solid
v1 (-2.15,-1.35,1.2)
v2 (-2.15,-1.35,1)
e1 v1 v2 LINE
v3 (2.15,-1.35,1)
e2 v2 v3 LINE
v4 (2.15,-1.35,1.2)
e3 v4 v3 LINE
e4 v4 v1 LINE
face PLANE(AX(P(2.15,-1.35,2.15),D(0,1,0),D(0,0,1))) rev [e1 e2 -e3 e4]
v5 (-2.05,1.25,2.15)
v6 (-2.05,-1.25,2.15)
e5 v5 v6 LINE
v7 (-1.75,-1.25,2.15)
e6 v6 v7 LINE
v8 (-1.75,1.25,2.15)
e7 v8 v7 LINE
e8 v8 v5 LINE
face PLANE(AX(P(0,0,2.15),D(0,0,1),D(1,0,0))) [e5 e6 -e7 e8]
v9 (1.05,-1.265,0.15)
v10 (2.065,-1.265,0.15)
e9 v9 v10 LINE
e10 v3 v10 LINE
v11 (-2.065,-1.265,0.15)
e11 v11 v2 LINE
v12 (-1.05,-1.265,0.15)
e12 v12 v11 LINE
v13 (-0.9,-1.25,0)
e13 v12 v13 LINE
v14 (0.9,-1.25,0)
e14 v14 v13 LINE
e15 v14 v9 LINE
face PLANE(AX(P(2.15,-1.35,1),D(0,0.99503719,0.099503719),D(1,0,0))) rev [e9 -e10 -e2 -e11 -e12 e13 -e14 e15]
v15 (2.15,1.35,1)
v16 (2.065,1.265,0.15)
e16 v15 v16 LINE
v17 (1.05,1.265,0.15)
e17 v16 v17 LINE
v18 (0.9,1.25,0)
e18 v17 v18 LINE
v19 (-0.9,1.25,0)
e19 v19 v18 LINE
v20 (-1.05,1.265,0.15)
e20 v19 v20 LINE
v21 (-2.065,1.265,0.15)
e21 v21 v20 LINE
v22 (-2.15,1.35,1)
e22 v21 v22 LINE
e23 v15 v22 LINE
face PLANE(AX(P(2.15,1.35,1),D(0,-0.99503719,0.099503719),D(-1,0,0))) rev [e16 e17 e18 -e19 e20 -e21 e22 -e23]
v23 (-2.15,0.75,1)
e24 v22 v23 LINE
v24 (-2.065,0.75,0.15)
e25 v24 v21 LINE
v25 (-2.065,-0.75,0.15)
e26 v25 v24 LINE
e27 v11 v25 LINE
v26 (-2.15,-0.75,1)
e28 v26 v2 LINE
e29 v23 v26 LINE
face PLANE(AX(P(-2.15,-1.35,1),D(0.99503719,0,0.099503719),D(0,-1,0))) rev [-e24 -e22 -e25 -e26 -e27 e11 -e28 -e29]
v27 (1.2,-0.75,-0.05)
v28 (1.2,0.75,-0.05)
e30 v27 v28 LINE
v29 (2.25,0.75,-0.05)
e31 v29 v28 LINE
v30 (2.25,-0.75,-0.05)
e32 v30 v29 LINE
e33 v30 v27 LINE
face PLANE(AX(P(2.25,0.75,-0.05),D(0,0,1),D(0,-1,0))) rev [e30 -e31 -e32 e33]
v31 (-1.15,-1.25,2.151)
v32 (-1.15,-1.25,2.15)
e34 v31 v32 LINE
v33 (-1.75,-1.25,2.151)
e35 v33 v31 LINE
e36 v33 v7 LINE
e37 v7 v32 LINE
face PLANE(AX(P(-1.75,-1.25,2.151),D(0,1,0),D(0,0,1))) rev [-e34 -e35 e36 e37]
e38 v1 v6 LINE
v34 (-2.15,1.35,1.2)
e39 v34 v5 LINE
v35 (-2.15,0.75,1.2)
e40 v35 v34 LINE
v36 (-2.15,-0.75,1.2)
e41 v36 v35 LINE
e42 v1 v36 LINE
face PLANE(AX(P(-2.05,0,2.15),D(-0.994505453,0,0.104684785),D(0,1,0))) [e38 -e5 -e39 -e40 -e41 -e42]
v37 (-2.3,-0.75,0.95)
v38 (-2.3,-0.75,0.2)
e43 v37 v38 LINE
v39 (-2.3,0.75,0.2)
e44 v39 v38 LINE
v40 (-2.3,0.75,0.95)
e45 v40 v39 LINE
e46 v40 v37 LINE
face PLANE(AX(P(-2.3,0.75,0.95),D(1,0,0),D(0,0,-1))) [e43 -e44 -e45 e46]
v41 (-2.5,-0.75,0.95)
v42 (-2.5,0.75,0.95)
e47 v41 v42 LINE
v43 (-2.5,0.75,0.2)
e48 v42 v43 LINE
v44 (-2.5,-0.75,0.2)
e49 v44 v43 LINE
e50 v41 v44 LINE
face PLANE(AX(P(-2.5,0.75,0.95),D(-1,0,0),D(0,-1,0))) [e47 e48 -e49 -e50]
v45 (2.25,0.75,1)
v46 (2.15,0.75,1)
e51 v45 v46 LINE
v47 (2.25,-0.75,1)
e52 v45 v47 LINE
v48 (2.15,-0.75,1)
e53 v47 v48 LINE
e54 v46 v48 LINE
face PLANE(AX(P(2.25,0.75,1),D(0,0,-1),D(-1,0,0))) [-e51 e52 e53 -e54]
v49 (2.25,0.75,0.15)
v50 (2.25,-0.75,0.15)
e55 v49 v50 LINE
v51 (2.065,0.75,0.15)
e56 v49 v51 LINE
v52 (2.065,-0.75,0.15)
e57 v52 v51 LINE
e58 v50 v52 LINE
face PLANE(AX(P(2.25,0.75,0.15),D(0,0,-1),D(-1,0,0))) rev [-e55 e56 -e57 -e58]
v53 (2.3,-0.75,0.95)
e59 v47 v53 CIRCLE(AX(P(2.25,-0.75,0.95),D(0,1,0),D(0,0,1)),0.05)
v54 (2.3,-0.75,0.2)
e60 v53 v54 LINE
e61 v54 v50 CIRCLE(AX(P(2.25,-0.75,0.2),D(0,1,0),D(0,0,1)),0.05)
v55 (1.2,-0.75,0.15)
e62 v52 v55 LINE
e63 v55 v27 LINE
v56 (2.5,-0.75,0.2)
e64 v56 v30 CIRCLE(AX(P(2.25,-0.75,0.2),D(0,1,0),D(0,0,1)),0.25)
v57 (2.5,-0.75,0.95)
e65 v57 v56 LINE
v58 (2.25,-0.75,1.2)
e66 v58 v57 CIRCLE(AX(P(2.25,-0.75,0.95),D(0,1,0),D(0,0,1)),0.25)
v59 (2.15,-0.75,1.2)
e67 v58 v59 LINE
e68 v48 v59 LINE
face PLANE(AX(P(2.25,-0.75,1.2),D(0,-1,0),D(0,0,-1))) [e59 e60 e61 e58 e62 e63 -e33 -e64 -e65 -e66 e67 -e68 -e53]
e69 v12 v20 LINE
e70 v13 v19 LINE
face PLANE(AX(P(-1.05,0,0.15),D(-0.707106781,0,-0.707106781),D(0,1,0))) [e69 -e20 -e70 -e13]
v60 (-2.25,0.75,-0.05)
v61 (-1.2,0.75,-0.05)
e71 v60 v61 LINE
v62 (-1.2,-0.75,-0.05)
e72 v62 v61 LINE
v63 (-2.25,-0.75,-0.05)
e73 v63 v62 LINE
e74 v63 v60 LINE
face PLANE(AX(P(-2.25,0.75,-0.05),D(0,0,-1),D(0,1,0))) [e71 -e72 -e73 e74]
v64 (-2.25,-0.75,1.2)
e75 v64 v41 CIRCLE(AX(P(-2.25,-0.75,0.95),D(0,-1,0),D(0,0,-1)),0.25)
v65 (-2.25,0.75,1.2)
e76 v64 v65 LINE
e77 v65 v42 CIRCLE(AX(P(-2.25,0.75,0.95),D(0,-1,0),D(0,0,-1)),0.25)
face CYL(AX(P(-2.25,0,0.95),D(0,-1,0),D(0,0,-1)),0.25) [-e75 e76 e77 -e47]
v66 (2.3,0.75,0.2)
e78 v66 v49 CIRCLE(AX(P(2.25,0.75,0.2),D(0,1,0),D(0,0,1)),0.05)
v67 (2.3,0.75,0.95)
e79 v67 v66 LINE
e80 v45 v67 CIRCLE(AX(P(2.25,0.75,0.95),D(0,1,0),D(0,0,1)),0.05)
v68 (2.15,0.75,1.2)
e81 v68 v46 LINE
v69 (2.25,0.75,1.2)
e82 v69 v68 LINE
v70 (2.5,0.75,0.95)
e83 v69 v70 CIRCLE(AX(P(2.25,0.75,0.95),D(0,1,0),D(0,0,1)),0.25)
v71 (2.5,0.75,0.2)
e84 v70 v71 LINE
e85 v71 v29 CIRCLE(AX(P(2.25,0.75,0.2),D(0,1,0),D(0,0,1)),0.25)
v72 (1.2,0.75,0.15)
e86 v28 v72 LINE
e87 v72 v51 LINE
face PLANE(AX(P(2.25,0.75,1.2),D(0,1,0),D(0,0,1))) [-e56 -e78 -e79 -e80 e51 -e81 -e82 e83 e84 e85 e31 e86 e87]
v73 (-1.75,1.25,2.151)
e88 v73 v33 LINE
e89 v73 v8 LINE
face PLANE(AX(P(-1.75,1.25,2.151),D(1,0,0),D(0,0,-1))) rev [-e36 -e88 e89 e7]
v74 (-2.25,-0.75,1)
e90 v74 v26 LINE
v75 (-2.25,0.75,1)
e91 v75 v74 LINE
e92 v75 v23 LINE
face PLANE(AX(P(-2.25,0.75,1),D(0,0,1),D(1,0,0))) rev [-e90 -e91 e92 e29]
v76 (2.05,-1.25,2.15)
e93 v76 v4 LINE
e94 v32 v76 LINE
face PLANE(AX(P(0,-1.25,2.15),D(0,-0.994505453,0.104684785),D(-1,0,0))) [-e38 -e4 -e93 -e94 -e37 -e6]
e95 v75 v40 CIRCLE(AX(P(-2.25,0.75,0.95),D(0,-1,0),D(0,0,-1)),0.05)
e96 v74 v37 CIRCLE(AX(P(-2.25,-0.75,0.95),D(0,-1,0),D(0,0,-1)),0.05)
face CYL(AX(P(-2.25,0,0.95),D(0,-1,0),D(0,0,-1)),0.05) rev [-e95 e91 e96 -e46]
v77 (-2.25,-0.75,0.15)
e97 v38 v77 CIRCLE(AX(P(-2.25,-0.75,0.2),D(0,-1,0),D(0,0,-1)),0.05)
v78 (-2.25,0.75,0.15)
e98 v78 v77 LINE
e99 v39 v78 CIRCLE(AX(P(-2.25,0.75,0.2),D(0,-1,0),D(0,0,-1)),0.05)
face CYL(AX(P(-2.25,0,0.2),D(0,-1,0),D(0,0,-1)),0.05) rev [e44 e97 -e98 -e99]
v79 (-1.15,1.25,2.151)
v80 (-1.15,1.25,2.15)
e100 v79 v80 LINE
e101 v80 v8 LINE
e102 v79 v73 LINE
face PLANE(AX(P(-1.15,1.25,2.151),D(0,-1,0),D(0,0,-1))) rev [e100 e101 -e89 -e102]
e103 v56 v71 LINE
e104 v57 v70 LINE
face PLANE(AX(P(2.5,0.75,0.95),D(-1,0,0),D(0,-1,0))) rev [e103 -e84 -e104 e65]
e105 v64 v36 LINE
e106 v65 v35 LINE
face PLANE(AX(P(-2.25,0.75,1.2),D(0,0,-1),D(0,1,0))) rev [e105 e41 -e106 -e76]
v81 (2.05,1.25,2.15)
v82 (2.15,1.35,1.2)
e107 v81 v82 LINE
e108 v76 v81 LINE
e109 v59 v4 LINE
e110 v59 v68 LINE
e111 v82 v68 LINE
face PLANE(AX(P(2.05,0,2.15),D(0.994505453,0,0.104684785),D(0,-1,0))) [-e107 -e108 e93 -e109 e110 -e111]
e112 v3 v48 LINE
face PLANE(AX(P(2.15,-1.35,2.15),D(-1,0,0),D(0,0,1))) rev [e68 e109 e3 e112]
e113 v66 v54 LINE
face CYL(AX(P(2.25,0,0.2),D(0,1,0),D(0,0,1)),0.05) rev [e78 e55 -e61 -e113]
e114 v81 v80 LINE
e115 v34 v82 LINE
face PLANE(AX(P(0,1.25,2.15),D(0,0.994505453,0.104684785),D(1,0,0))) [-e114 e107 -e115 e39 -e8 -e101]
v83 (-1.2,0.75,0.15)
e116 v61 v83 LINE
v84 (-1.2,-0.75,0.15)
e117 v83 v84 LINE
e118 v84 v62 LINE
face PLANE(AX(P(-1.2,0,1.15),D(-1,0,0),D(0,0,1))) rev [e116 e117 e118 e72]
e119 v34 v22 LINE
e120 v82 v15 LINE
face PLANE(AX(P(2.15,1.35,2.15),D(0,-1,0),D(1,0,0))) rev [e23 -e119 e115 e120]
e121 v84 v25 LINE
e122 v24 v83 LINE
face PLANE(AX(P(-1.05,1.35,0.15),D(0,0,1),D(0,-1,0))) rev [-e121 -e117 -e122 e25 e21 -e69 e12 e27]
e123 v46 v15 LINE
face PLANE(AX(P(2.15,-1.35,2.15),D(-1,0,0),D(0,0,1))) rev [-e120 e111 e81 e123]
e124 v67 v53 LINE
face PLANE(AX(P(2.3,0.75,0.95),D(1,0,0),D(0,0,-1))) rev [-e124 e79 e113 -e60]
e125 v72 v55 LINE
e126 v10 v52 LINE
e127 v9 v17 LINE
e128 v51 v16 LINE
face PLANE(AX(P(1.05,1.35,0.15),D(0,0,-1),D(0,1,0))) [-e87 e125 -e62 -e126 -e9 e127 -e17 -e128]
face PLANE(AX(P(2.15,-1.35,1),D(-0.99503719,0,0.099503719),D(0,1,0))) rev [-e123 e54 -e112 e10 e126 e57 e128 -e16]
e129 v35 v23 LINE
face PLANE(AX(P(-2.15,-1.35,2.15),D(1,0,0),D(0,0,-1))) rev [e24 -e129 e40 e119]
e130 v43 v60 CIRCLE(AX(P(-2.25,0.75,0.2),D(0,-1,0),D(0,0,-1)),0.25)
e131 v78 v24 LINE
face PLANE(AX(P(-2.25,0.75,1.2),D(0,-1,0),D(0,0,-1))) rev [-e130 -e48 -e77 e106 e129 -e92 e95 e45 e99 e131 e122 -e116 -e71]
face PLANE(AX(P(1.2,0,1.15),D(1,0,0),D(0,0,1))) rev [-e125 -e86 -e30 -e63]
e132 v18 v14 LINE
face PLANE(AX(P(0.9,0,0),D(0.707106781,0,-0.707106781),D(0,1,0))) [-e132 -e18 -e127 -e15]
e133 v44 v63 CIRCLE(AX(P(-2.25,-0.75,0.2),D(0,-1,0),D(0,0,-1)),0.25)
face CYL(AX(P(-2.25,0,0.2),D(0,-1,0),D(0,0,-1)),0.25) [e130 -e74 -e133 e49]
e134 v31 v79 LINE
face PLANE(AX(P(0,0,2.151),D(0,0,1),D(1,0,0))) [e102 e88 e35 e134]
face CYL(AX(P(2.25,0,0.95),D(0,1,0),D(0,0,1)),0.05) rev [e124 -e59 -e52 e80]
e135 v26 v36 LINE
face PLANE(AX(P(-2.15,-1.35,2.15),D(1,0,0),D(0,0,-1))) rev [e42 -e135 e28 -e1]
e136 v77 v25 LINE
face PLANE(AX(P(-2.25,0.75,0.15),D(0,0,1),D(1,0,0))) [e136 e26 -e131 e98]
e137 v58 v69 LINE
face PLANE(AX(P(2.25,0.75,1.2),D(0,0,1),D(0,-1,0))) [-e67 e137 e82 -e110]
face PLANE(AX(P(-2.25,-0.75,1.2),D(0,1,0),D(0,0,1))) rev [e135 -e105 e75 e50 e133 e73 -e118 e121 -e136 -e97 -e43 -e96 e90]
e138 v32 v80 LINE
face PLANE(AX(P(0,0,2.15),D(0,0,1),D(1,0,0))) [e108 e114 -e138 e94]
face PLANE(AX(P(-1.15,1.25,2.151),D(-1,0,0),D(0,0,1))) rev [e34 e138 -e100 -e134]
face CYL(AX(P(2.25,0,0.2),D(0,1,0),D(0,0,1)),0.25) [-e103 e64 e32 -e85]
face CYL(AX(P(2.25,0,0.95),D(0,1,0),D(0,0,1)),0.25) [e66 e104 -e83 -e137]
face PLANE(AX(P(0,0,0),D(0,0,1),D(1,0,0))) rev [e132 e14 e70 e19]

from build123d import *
from OCP.BRepFilletAPI import BRepFilletAPI_MakeChamfer

# Parameters (mm, degrees)
SZKIC1_W                    = 4.3
SZKIC1_H                    = 2.7
DODANIE_WYCI_GNI_CIE1_DEPTH = 2.15
SFAZOWANIE1_SIZE            = 0.95
SFAZOWANIE1_SIZE2           = 0.1
SFAZOWANIE2_SIZE            = 0.1
SFAZOWANIE2_SIZE2           = 1
SZKIC2_W                    = 0.6
SZKIC2_H                    = 2.5
DODANIE_WYCI_GNI_CIE2_DEPTH = 0.001
SZKIC3_W                    = 0.15
SZKIC3_H                    = 2.7
WYTNIJ_WYCI_GNI_CIE1_DEPTH  = 1.1
SFAZOWANIE3_SIZE            = 0.15
SZKIC4_W                    = 0.2
SZKIC4_H                    = 1.5
SFAZOWANIE3_OF_LUSTRO1_SIZE = 0.15


with BuildPart() as part:
    # Szkic1 → Dodanie-wyciągnięcie1 (new body)
    with BuildSketch(Plane.XY):
        Rectangle(SZKIC1_W, SZKIC1_H)
    extrude(amount=DODANIE_WYCI_GNI_CIE1_DEPTH)

    # Sfazowanie1: one chamfer whose edges measure the first distance from different faces: ONE call of the kernel's chamfer builder (chamfer() names one face for all edges)
    sfazowanie1_edges_1 = [part.edges().sort_by_distance(p)[0] for p in [
        (2.15, 0, 2.15),
    ]]
    sfazowanie1_side_1 = [part.faces().sort_by_distance(p)[0] for p in [
        (2.15, 0, 1.075),
    ]]
    sfazowanie1_edges_2 = [part.edges().sort_by_distance(p)[0] for p in [
        (0, 1.35, 2.15),
    ]]
    sfazowanie1_side_2 = [part.faces().sort_by_distance(p)[0] for p in [
        (0, 1.35, 1.075),
    ]]
    sfazowanie1_edges_3 = [part.edges().sort_by_distance(p)[0] for p in [
        (-2.15, 0, 2.15),
    ]]
    sfazowanie1_side_3 = [part.faces().sort_by_distance(p)[0] for p in [
        (-2.15, 0, 1.075),
    ]]
    sfazowanie1_edges_4 = [part.edges().sort_by_distance(p)[0] for p in [
        (0, -1.35, 2.15),
    ]]
    sfazowanie1_side_4 = [part.faces().sort_by_distance(p)[0] for p in [
        (0, -1.35, 1.075),
    ]]
    sfazowanie1 = BRepFilletAPI_MakeChamfer(part.part.solid().wrapped)
    for e in sfazowanie1_edges_1:
        sfazowanie1.Add(SFAZOWANIE1_SIZE, SFAZOWANIE1_SIZE2, e.wrapped, sfazowanie1_side_1[0].wrapped)  # the first distance lies on this face
    for e in sfazowanie1_edges_2:
        sfazowanie1.Add(SFAZOWANIE1_SIZE, SFAZOWANIE1_SIZE2, e.wrapped, sfazowanie1_side_2[0].wrapped)  # the first distance lies on this face
    for e in sfazowanie1_edges_3:
        sfazowanie1.Add(SFAZOWANIE1_SIZE, SFAZOWANIE1_SIZE2, e.wrapped, sfazowanie1_side_3[0].wrapped)  # the first distance lies on this face
    for e in sfazowanie1_edges_4:
        sfazowanie1.Add(SFAZOWANIE1_SIZE, SFAZOWANIE1_SIZE2, e.wrapped, sfazowanie1_side_4[0].wrapped)  # the first distance lies on this face
    add(Compound.cast(sfazowanie1.Shape()), mode=Mode.REPLACE)

    # Sfazowanie2
    sfazowanie2_edges = [part.edges().sort_by_distance(p)[0] for p in [
        (0, 1.35, 0),
        (2.15, 0, 0),
        (0, -1.35, 0),
        (-2.15, 0, 0),
    ]]
    sfazowanie2_side = [part.faces().sort_by_distance(p)[0] for p in [
        (0, 0, 0),
    ]]
    chamfer(sfazowanie2_edges, length=SFAZOWANIE2_SIZE, length2=SFAZOWANIE2_SIZE2, reference=sfazowanie2_side[0])

    # Szkic2 → Dodanie-wyciągnięcie2 (add)
    with BuildSketch(Plane.XY.offset(2.15)):
        with Locations((-1.45, 0)):
            Rectangle(SZKIC2_W, SZKIC2_H)
    extrude(amount=DODANIE_WYCI_GNI_CIE2_DEPTH)

    # Szkic3 → Wytnij-wyciągnięcie1 (cut)
    with BuildSketch(Plane.ZY.offset(2.15)):
        with Locations((0.075, 0)):
            Rectangle(SZKIC3_W, SZKIC3_H)
    wytnij_wyci_gni_cie1 = extrude(amount=-WYTNIJ_WYCI_GNI_CIE1_DEPTH, mode=Mode.SUBTRACT)

    # Sfazowanie3
    sfazowanie3_edges = [part.edges().sort_by_distance(p)[0] for p in [
        (-1.05, 0, 0),
    ]]
    chamfer(sfazowanie3_edges, length=SFAZOWANIE3_SIZE - 0.0001)  # a hair under: the kernel refuses the full size

    # Wyciągnięcie po ścieżce2: sweep along a path in Szkic6
    with BuildLine(Plane(origin=(0, 0, 0), x_dir=(1, 0, 0), z_dir=(0, 1, 0))) as wyci_gni_cie_po_cie_ce2_path:
        Line((-2.15, -1.2), (-2.25, -1.2))
        ThreePointArc((-2.25, -1.2), (-2.426776695, -1.126776695), (-2.5, -0.95))
        Line((-2.5, -0.95), (-2.5, -0.2))
        ThreePointArc((-2.5, -0.2), (-2.426776695, -0.023223305), (-2.25, 0.05))
        Line((-2.25, 0.05), (-1.2, 0.05))
    # Szkic4 → Wyciągnięcie po ścieżce2 (sweep)
    with BuildSketch(Plane.ZY.offset(2.15)):
        with Locations((1.1, 0)):
            Rectangle(SZKIC4_W, SZKIC4_H)
    wyci_gni_cie_po_cie_ce2 = sweep(path=wyci_gni_cie_po_cie_ce2_path.line)

    # Lustro1: Wytnij-wyciągnięcie1, Wyciągnięcie po ścieżce2 across plane
    add(wytnij_wyci_gni_cie1.mirror(Plane(origin=(0, 0, 0), x_dir=(0, 0, 1), z_dir=(1, 0, 0))), mode=Mode.SUBTRACT)
    add(wyci_gni_cie_po_cie_ce2.mirror(Plane(origin=(0, 0, 0), x_dir=(0, 0, 1), z_dir=(1, 0, 0))))

    # Sfazowanie3 of Lustro1
    sfazowanie3_of_lustro1_edges = [part.edges().sort_by_distance(p)[0] for p in [
        (1.05, 0, 0),
    ]]
    chamfer(sfazowanie3_of_lustro1_edges, length=SFAZOWANIE3_OF_LUSTRO1_SIZE - 0.0001)  # a hair under: the kernel refuses the full size


solid = part.part
